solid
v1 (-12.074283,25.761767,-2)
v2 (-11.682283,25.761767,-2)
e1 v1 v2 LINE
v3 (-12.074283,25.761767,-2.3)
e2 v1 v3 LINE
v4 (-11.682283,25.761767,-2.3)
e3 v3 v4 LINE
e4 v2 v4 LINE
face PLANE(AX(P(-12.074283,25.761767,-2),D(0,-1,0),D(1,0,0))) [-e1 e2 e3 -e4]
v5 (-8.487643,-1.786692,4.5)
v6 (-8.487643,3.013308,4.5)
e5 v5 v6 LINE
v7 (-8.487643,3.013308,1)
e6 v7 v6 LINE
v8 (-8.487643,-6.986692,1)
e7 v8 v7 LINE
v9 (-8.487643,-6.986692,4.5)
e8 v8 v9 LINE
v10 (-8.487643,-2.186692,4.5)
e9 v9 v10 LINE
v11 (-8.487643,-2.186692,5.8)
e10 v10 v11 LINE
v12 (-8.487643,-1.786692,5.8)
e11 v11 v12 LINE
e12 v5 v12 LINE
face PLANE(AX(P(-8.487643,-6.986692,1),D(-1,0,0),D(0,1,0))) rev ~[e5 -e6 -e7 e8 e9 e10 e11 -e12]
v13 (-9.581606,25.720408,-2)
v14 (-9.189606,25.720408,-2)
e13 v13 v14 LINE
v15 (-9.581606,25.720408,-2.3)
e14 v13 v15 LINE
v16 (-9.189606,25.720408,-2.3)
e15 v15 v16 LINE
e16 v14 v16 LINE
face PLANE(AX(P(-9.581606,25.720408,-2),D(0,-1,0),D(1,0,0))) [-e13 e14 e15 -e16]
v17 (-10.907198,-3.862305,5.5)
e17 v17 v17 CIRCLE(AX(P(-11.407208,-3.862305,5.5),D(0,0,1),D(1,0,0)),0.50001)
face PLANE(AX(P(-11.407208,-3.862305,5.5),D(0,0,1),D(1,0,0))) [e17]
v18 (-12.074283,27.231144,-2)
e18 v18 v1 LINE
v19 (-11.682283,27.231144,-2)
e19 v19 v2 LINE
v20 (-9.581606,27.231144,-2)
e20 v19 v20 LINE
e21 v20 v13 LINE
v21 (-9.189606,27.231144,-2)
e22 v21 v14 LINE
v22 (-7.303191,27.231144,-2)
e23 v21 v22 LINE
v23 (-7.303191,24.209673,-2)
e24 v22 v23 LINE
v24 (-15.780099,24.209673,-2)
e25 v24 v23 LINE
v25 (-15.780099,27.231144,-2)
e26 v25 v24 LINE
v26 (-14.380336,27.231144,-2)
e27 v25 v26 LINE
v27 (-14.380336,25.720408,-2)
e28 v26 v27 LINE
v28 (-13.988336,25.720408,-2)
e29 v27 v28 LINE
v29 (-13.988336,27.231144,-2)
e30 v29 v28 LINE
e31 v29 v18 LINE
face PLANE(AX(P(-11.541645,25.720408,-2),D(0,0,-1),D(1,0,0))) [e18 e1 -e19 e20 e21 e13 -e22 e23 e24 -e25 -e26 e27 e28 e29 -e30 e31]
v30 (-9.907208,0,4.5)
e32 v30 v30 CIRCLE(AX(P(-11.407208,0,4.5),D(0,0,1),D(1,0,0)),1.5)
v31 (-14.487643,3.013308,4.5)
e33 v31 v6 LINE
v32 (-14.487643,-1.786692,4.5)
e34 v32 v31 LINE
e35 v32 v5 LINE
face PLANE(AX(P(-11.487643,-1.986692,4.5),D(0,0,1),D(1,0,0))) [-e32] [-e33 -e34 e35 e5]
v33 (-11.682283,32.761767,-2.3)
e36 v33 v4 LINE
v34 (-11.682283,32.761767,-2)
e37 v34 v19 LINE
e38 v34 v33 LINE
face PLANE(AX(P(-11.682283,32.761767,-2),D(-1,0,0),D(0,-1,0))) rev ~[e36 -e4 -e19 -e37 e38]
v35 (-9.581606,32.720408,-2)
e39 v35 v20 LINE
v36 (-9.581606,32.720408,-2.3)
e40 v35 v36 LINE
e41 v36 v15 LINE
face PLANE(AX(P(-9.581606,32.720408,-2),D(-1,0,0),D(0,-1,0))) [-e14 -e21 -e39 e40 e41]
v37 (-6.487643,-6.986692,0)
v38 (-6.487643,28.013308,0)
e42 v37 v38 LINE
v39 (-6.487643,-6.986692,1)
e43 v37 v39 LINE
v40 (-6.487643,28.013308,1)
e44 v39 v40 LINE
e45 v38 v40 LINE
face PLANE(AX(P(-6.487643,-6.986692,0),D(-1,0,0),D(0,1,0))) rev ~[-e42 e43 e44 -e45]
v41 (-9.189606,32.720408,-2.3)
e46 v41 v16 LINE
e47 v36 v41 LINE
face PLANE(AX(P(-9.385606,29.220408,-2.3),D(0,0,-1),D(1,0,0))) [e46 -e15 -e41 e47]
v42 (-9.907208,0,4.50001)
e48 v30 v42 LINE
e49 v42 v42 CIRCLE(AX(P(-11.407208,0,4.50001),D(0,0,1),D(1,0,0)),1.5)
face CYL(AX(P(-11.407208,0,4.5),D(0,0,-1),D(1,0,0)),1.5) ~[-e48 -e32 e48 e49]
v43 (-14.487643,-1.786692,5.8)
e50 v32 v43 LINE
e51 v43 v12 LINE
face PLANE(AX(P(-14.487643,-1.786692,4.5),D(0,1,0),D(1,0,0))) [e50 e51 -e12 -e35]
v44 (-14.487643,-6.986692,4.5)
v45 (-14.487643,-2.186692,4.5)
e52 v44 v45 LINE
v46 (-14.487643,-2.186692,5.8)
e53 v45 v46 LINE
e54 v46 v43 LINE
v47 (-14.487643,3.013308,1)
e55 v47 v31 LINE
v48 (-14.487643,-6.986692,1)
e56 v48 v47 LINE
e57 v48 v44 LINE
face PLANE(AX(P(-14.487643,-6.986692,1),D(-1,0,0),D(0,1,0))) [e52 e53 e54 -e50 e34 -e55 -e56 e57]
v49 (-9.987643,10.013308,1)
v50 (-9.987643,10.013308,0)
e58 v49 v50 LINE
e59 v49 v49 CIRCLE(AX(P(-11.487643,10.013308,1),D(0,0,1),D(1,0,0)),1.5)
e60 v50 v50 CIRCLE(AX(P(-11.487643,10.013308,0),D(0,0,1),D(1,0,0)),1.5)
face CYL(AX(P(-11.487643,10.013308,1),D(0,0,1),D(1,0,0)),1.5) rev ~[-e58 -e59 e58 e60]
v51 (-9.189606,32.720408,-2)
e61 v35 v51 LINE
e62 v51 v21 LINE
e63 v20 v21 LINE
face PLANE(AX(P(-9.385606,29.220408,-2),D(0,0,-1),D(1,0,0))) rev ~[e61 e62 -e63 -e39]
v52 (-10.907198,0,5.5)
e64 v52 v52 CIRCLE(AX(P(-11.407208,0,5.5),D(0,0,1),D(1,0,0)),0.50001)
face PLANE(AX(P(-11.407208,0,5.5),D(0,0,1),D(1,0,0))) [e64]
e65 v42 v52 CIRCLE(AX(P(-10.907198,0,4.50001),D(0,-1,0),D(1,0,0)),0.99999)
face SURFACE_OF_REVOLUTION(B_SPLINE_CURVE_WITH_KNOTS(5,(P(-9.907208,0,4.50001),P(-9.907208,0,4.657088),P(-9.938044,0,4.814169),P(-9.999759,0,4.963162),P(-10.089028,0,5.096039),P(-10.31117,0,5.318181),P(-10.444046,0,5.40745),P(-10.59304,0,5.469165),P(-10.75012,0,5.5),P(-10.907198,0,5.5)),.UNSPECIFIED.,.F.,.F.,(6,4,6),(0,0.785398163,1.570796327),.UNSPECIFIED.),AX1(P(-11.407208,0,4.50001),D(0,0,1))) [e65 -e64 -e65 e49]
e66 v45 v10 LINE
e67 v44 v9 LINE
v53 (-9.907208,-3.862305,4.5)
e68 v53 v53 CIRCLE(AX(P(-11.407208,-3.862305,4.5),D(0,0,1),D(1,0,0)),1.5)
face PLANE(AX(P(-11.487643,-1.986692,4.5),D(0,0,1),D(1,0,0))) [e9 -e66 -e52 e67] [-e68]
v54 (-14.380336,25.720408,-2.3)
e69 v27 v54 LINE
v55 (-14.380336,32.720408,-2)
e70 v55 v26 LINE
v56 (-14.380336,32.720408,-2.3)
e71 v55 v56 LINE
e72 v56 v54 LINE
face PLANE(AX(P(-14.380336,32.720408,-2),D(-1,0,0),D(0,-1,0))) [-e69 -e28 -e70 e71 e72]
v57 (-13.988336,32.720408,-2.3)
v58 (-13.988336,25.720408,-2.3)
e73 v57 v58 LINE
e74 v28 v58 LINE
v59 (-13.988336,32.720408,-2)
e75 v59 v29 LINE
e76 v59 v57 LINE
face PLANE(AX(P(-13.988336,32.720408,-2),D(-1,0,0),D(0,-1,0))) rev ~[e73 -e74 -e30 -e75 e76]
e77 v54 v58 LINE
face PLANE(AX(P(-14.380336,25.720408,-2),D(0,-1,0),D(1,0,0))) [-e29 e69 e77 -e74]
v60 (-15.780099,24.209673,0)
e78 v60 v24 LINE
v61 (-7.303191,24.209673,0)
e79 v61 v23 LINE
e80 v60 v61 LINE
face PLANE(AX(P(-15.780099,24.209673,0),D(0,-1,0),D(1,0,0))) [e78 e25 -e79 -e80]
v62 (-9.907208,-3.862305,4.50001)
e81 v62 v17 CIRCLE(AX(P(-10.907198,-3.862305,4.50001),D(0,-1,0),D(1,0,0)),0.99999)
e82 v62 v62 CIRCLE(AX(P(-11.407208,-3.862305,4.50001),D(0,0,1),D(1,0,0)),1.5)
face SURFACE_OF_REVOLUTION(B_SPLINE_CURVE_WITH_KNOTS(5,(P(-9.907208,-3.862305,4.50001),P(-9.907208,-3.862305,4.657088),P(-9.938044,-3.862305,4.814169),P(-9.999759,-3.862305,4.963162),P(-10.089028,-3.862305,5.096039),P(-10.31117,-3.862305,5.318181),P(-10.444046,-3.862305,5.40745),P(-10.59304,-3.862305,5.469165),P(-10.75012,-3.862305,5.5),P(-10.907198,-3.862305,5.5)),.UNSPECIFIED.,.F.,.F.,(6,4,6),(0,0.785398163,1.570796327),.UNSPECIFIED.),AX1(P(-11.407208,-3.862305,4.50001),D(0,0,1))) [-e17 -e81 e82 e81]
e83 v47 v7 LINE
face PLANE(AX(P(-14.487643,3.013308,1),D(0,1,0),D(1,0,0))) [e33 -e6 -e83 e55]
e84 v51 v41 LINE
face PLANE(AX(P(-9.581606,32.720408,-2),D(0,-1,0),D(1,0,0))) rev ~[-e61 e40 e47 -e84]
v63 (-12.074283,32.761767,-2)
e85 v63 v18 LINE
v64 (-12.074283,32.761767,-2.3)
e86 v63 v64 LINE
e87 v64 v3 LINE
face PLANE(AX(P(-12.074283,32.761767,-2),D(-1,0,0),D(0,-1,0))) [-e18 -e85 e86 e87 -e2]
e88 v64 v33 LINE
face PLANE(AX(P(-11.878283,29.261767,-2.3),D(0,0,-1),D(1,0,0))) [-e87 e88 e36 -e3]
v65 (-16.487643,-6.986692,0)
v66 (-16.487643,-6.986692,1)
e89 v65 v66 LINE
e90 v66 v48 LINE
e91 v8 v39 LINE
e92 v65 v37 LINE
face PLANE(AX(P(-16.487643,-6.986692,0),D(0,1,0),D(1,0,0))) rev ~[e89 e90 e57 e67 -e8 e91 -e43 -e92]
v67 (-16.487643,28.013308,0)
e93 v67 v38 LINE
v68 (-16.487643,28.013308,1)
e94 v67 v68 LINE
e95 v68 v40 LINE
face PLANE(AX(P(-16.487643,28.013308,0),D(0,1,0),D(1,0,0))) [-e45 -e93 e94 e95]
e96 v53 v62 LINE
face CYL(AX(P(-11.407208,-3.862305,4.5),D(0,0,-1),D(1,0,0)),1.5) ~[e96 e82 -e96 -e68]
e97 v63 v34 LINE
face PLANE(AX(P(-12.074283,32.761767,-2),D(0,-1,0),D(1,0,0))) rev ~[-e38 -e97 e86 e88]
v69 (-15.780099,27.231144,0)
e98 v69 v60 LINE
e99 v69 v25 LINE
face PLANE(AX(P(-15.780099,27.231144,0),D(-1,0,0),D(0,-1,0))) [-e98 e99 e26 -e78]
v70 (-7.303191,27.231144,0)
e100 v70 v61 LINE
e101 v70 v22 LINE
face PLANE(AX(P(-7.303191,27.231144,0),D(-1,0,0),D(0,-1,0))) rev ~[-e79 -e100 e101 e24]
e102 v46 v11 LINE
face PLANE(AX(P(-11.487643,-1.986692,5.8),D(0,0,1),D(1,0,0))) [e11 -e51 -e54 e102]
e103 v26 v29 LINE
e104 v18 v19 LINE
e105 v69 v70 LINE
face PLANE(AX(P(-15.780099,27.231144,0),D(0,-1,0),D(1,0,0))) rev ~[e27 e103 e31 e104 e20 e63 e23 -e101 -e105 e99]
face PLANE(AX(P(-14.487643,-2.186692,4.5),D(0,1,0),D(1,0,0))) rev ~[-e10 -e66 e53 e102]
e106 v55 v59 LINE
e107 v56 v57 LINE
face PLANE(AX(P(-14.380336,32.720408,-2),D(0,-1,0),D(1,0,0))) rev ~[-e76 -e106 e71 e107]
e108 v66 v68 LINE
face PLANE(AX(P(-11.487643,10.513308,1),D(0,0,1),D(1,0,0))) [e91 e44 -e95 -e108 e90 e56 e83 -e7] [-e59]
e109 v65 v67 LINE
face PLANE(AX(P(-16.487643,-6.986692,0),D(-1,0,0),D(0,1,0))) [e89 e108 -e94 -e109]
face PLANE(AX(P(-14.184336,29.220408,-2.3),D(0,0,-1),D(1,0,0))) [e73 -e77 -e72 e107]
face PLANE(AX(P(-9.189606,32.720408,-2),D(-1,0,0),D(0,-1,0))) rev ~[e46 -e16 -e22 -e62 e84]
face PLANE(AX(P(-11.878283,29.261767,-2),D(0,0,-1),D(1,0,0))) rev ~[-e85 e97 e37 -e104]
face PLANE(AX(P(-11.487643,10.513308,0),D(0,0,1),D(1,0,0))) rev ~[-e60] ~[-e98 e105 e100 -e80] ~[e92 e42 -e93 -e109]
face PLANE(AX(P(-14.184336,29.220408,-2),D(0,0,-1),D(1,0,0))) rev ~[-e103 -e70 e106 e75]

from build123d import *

# Parameters (mm, degrees)
F0_W      = 10
F0_H      = 35
F1_DEPTH  = 1
F2_W      = 6
F2_H      = 10
F3_DEPTH  = 3.5
F4_R      = 1.5
F5_DEPTH  = 1
F6_W      = 8.476907853
F6_H      = 3.0214712024
F7_DEPTH  = 2
F8_W      = 0.392
F8_H      = 7
F9_DEPTH  = 0.3
F10_R     = 1.5
F11_DEPTH = 3.301
F12_R     = 0.99999
F13_W     = 6
F13_H     = 0.4
F14_DEPTH = 1.3


# Not quite as in the source:
# - a fillet or chamfer is up to 0.001 mm smaller than in the source, because OpenCascade refuses the exact size


with BuildPart() as f1:
    # F0 (on Top) → F1 (new body)
    with BuildSketch(Plane.XY):
        with Locations((-11.4876428805, 10.5133079179)):
            Rectangle(F0_W, F0_H)
    extrude(amount=F1_DEPTH)

    # F2 (on face) → F3 (join)
    with BuildSketch(Plane.XY.offset(1)):
        with Locations((-11.4876428805, -1.9866920821)):
            Rectangle(F2_W, F2_H)
    extrude(amount=F3_DEPTH)

    # F4 (on face) → F5 (join)
    with BuildSketch(Plane.XY.offset(4.5)):
        with Locations((-11.4072084332, 0)):
            Circle(F4_R)
        with Locations((-11.4072084332, -3.8623050655)):
            Circle(F4_R)
    extrude(amount=F5_DEPTH)

    # F6 (on face) → F7 (join)
    with BuildSketch(Plane(origin=(0, 0, 0), x_dir=(1, 0, 0), z_dir=(0, 0, -1))):
        with Locations((-11.5416448098, -25.7204081863)):
            Rectangle(F6_W, F6_H)
    extrude(amount=F7_DEPTH)

    # F8 (on face) → F9 (join)
    with BuildSketch(Plane(origin=(0, 0, -2), x_dir=(1, 0, 0), z_dir=(0, 0, -1))):
        with Locations((-14.1843358078, -29.2204081863)):
            Rectangle(F8_W, F8_H)
        with Locations((-11.8782826397, -29.261767303)):
            Rectangle(F8_W, F8_H)
        with Locations((-9.3856059038, -29.2204081863)):
            Rectangle(F8_W, F8_H)
    extrude(amount=F9_DEPTH)

    # F10 (on face) → F11 (cut, through all)
    with BuildSketch(Plane.XY.offset(1)):
        with Locations((-11.4876428805, 10.0133079179)):
            Circle(F10_R)
    extrude(amount=-F11_DEPTH, mode=Mode.SUBTRACT)

    # F12 (radius 1 in the source; OpenCascade refuses exactly that, so slightly less here)
    f12_edges = [f1.edges().sort_by_distance(p)[0] for p in [
        (-12.907208, -3.862305, 5.5),
        (-12.907208, 0, 5.5),
    ]]
    fillet(f12_edges, radius=F12_R)

    # F13 (on face) → F14 (join)
    with BuildSketch(Plane.XY.offset(4.5)):
        with Locations((-11.4876428805, -1.9866920821)):
            Rectangle(F13_W, F13_H)
    extrude(amount=F14_DEPTH)


solid = f1.part
